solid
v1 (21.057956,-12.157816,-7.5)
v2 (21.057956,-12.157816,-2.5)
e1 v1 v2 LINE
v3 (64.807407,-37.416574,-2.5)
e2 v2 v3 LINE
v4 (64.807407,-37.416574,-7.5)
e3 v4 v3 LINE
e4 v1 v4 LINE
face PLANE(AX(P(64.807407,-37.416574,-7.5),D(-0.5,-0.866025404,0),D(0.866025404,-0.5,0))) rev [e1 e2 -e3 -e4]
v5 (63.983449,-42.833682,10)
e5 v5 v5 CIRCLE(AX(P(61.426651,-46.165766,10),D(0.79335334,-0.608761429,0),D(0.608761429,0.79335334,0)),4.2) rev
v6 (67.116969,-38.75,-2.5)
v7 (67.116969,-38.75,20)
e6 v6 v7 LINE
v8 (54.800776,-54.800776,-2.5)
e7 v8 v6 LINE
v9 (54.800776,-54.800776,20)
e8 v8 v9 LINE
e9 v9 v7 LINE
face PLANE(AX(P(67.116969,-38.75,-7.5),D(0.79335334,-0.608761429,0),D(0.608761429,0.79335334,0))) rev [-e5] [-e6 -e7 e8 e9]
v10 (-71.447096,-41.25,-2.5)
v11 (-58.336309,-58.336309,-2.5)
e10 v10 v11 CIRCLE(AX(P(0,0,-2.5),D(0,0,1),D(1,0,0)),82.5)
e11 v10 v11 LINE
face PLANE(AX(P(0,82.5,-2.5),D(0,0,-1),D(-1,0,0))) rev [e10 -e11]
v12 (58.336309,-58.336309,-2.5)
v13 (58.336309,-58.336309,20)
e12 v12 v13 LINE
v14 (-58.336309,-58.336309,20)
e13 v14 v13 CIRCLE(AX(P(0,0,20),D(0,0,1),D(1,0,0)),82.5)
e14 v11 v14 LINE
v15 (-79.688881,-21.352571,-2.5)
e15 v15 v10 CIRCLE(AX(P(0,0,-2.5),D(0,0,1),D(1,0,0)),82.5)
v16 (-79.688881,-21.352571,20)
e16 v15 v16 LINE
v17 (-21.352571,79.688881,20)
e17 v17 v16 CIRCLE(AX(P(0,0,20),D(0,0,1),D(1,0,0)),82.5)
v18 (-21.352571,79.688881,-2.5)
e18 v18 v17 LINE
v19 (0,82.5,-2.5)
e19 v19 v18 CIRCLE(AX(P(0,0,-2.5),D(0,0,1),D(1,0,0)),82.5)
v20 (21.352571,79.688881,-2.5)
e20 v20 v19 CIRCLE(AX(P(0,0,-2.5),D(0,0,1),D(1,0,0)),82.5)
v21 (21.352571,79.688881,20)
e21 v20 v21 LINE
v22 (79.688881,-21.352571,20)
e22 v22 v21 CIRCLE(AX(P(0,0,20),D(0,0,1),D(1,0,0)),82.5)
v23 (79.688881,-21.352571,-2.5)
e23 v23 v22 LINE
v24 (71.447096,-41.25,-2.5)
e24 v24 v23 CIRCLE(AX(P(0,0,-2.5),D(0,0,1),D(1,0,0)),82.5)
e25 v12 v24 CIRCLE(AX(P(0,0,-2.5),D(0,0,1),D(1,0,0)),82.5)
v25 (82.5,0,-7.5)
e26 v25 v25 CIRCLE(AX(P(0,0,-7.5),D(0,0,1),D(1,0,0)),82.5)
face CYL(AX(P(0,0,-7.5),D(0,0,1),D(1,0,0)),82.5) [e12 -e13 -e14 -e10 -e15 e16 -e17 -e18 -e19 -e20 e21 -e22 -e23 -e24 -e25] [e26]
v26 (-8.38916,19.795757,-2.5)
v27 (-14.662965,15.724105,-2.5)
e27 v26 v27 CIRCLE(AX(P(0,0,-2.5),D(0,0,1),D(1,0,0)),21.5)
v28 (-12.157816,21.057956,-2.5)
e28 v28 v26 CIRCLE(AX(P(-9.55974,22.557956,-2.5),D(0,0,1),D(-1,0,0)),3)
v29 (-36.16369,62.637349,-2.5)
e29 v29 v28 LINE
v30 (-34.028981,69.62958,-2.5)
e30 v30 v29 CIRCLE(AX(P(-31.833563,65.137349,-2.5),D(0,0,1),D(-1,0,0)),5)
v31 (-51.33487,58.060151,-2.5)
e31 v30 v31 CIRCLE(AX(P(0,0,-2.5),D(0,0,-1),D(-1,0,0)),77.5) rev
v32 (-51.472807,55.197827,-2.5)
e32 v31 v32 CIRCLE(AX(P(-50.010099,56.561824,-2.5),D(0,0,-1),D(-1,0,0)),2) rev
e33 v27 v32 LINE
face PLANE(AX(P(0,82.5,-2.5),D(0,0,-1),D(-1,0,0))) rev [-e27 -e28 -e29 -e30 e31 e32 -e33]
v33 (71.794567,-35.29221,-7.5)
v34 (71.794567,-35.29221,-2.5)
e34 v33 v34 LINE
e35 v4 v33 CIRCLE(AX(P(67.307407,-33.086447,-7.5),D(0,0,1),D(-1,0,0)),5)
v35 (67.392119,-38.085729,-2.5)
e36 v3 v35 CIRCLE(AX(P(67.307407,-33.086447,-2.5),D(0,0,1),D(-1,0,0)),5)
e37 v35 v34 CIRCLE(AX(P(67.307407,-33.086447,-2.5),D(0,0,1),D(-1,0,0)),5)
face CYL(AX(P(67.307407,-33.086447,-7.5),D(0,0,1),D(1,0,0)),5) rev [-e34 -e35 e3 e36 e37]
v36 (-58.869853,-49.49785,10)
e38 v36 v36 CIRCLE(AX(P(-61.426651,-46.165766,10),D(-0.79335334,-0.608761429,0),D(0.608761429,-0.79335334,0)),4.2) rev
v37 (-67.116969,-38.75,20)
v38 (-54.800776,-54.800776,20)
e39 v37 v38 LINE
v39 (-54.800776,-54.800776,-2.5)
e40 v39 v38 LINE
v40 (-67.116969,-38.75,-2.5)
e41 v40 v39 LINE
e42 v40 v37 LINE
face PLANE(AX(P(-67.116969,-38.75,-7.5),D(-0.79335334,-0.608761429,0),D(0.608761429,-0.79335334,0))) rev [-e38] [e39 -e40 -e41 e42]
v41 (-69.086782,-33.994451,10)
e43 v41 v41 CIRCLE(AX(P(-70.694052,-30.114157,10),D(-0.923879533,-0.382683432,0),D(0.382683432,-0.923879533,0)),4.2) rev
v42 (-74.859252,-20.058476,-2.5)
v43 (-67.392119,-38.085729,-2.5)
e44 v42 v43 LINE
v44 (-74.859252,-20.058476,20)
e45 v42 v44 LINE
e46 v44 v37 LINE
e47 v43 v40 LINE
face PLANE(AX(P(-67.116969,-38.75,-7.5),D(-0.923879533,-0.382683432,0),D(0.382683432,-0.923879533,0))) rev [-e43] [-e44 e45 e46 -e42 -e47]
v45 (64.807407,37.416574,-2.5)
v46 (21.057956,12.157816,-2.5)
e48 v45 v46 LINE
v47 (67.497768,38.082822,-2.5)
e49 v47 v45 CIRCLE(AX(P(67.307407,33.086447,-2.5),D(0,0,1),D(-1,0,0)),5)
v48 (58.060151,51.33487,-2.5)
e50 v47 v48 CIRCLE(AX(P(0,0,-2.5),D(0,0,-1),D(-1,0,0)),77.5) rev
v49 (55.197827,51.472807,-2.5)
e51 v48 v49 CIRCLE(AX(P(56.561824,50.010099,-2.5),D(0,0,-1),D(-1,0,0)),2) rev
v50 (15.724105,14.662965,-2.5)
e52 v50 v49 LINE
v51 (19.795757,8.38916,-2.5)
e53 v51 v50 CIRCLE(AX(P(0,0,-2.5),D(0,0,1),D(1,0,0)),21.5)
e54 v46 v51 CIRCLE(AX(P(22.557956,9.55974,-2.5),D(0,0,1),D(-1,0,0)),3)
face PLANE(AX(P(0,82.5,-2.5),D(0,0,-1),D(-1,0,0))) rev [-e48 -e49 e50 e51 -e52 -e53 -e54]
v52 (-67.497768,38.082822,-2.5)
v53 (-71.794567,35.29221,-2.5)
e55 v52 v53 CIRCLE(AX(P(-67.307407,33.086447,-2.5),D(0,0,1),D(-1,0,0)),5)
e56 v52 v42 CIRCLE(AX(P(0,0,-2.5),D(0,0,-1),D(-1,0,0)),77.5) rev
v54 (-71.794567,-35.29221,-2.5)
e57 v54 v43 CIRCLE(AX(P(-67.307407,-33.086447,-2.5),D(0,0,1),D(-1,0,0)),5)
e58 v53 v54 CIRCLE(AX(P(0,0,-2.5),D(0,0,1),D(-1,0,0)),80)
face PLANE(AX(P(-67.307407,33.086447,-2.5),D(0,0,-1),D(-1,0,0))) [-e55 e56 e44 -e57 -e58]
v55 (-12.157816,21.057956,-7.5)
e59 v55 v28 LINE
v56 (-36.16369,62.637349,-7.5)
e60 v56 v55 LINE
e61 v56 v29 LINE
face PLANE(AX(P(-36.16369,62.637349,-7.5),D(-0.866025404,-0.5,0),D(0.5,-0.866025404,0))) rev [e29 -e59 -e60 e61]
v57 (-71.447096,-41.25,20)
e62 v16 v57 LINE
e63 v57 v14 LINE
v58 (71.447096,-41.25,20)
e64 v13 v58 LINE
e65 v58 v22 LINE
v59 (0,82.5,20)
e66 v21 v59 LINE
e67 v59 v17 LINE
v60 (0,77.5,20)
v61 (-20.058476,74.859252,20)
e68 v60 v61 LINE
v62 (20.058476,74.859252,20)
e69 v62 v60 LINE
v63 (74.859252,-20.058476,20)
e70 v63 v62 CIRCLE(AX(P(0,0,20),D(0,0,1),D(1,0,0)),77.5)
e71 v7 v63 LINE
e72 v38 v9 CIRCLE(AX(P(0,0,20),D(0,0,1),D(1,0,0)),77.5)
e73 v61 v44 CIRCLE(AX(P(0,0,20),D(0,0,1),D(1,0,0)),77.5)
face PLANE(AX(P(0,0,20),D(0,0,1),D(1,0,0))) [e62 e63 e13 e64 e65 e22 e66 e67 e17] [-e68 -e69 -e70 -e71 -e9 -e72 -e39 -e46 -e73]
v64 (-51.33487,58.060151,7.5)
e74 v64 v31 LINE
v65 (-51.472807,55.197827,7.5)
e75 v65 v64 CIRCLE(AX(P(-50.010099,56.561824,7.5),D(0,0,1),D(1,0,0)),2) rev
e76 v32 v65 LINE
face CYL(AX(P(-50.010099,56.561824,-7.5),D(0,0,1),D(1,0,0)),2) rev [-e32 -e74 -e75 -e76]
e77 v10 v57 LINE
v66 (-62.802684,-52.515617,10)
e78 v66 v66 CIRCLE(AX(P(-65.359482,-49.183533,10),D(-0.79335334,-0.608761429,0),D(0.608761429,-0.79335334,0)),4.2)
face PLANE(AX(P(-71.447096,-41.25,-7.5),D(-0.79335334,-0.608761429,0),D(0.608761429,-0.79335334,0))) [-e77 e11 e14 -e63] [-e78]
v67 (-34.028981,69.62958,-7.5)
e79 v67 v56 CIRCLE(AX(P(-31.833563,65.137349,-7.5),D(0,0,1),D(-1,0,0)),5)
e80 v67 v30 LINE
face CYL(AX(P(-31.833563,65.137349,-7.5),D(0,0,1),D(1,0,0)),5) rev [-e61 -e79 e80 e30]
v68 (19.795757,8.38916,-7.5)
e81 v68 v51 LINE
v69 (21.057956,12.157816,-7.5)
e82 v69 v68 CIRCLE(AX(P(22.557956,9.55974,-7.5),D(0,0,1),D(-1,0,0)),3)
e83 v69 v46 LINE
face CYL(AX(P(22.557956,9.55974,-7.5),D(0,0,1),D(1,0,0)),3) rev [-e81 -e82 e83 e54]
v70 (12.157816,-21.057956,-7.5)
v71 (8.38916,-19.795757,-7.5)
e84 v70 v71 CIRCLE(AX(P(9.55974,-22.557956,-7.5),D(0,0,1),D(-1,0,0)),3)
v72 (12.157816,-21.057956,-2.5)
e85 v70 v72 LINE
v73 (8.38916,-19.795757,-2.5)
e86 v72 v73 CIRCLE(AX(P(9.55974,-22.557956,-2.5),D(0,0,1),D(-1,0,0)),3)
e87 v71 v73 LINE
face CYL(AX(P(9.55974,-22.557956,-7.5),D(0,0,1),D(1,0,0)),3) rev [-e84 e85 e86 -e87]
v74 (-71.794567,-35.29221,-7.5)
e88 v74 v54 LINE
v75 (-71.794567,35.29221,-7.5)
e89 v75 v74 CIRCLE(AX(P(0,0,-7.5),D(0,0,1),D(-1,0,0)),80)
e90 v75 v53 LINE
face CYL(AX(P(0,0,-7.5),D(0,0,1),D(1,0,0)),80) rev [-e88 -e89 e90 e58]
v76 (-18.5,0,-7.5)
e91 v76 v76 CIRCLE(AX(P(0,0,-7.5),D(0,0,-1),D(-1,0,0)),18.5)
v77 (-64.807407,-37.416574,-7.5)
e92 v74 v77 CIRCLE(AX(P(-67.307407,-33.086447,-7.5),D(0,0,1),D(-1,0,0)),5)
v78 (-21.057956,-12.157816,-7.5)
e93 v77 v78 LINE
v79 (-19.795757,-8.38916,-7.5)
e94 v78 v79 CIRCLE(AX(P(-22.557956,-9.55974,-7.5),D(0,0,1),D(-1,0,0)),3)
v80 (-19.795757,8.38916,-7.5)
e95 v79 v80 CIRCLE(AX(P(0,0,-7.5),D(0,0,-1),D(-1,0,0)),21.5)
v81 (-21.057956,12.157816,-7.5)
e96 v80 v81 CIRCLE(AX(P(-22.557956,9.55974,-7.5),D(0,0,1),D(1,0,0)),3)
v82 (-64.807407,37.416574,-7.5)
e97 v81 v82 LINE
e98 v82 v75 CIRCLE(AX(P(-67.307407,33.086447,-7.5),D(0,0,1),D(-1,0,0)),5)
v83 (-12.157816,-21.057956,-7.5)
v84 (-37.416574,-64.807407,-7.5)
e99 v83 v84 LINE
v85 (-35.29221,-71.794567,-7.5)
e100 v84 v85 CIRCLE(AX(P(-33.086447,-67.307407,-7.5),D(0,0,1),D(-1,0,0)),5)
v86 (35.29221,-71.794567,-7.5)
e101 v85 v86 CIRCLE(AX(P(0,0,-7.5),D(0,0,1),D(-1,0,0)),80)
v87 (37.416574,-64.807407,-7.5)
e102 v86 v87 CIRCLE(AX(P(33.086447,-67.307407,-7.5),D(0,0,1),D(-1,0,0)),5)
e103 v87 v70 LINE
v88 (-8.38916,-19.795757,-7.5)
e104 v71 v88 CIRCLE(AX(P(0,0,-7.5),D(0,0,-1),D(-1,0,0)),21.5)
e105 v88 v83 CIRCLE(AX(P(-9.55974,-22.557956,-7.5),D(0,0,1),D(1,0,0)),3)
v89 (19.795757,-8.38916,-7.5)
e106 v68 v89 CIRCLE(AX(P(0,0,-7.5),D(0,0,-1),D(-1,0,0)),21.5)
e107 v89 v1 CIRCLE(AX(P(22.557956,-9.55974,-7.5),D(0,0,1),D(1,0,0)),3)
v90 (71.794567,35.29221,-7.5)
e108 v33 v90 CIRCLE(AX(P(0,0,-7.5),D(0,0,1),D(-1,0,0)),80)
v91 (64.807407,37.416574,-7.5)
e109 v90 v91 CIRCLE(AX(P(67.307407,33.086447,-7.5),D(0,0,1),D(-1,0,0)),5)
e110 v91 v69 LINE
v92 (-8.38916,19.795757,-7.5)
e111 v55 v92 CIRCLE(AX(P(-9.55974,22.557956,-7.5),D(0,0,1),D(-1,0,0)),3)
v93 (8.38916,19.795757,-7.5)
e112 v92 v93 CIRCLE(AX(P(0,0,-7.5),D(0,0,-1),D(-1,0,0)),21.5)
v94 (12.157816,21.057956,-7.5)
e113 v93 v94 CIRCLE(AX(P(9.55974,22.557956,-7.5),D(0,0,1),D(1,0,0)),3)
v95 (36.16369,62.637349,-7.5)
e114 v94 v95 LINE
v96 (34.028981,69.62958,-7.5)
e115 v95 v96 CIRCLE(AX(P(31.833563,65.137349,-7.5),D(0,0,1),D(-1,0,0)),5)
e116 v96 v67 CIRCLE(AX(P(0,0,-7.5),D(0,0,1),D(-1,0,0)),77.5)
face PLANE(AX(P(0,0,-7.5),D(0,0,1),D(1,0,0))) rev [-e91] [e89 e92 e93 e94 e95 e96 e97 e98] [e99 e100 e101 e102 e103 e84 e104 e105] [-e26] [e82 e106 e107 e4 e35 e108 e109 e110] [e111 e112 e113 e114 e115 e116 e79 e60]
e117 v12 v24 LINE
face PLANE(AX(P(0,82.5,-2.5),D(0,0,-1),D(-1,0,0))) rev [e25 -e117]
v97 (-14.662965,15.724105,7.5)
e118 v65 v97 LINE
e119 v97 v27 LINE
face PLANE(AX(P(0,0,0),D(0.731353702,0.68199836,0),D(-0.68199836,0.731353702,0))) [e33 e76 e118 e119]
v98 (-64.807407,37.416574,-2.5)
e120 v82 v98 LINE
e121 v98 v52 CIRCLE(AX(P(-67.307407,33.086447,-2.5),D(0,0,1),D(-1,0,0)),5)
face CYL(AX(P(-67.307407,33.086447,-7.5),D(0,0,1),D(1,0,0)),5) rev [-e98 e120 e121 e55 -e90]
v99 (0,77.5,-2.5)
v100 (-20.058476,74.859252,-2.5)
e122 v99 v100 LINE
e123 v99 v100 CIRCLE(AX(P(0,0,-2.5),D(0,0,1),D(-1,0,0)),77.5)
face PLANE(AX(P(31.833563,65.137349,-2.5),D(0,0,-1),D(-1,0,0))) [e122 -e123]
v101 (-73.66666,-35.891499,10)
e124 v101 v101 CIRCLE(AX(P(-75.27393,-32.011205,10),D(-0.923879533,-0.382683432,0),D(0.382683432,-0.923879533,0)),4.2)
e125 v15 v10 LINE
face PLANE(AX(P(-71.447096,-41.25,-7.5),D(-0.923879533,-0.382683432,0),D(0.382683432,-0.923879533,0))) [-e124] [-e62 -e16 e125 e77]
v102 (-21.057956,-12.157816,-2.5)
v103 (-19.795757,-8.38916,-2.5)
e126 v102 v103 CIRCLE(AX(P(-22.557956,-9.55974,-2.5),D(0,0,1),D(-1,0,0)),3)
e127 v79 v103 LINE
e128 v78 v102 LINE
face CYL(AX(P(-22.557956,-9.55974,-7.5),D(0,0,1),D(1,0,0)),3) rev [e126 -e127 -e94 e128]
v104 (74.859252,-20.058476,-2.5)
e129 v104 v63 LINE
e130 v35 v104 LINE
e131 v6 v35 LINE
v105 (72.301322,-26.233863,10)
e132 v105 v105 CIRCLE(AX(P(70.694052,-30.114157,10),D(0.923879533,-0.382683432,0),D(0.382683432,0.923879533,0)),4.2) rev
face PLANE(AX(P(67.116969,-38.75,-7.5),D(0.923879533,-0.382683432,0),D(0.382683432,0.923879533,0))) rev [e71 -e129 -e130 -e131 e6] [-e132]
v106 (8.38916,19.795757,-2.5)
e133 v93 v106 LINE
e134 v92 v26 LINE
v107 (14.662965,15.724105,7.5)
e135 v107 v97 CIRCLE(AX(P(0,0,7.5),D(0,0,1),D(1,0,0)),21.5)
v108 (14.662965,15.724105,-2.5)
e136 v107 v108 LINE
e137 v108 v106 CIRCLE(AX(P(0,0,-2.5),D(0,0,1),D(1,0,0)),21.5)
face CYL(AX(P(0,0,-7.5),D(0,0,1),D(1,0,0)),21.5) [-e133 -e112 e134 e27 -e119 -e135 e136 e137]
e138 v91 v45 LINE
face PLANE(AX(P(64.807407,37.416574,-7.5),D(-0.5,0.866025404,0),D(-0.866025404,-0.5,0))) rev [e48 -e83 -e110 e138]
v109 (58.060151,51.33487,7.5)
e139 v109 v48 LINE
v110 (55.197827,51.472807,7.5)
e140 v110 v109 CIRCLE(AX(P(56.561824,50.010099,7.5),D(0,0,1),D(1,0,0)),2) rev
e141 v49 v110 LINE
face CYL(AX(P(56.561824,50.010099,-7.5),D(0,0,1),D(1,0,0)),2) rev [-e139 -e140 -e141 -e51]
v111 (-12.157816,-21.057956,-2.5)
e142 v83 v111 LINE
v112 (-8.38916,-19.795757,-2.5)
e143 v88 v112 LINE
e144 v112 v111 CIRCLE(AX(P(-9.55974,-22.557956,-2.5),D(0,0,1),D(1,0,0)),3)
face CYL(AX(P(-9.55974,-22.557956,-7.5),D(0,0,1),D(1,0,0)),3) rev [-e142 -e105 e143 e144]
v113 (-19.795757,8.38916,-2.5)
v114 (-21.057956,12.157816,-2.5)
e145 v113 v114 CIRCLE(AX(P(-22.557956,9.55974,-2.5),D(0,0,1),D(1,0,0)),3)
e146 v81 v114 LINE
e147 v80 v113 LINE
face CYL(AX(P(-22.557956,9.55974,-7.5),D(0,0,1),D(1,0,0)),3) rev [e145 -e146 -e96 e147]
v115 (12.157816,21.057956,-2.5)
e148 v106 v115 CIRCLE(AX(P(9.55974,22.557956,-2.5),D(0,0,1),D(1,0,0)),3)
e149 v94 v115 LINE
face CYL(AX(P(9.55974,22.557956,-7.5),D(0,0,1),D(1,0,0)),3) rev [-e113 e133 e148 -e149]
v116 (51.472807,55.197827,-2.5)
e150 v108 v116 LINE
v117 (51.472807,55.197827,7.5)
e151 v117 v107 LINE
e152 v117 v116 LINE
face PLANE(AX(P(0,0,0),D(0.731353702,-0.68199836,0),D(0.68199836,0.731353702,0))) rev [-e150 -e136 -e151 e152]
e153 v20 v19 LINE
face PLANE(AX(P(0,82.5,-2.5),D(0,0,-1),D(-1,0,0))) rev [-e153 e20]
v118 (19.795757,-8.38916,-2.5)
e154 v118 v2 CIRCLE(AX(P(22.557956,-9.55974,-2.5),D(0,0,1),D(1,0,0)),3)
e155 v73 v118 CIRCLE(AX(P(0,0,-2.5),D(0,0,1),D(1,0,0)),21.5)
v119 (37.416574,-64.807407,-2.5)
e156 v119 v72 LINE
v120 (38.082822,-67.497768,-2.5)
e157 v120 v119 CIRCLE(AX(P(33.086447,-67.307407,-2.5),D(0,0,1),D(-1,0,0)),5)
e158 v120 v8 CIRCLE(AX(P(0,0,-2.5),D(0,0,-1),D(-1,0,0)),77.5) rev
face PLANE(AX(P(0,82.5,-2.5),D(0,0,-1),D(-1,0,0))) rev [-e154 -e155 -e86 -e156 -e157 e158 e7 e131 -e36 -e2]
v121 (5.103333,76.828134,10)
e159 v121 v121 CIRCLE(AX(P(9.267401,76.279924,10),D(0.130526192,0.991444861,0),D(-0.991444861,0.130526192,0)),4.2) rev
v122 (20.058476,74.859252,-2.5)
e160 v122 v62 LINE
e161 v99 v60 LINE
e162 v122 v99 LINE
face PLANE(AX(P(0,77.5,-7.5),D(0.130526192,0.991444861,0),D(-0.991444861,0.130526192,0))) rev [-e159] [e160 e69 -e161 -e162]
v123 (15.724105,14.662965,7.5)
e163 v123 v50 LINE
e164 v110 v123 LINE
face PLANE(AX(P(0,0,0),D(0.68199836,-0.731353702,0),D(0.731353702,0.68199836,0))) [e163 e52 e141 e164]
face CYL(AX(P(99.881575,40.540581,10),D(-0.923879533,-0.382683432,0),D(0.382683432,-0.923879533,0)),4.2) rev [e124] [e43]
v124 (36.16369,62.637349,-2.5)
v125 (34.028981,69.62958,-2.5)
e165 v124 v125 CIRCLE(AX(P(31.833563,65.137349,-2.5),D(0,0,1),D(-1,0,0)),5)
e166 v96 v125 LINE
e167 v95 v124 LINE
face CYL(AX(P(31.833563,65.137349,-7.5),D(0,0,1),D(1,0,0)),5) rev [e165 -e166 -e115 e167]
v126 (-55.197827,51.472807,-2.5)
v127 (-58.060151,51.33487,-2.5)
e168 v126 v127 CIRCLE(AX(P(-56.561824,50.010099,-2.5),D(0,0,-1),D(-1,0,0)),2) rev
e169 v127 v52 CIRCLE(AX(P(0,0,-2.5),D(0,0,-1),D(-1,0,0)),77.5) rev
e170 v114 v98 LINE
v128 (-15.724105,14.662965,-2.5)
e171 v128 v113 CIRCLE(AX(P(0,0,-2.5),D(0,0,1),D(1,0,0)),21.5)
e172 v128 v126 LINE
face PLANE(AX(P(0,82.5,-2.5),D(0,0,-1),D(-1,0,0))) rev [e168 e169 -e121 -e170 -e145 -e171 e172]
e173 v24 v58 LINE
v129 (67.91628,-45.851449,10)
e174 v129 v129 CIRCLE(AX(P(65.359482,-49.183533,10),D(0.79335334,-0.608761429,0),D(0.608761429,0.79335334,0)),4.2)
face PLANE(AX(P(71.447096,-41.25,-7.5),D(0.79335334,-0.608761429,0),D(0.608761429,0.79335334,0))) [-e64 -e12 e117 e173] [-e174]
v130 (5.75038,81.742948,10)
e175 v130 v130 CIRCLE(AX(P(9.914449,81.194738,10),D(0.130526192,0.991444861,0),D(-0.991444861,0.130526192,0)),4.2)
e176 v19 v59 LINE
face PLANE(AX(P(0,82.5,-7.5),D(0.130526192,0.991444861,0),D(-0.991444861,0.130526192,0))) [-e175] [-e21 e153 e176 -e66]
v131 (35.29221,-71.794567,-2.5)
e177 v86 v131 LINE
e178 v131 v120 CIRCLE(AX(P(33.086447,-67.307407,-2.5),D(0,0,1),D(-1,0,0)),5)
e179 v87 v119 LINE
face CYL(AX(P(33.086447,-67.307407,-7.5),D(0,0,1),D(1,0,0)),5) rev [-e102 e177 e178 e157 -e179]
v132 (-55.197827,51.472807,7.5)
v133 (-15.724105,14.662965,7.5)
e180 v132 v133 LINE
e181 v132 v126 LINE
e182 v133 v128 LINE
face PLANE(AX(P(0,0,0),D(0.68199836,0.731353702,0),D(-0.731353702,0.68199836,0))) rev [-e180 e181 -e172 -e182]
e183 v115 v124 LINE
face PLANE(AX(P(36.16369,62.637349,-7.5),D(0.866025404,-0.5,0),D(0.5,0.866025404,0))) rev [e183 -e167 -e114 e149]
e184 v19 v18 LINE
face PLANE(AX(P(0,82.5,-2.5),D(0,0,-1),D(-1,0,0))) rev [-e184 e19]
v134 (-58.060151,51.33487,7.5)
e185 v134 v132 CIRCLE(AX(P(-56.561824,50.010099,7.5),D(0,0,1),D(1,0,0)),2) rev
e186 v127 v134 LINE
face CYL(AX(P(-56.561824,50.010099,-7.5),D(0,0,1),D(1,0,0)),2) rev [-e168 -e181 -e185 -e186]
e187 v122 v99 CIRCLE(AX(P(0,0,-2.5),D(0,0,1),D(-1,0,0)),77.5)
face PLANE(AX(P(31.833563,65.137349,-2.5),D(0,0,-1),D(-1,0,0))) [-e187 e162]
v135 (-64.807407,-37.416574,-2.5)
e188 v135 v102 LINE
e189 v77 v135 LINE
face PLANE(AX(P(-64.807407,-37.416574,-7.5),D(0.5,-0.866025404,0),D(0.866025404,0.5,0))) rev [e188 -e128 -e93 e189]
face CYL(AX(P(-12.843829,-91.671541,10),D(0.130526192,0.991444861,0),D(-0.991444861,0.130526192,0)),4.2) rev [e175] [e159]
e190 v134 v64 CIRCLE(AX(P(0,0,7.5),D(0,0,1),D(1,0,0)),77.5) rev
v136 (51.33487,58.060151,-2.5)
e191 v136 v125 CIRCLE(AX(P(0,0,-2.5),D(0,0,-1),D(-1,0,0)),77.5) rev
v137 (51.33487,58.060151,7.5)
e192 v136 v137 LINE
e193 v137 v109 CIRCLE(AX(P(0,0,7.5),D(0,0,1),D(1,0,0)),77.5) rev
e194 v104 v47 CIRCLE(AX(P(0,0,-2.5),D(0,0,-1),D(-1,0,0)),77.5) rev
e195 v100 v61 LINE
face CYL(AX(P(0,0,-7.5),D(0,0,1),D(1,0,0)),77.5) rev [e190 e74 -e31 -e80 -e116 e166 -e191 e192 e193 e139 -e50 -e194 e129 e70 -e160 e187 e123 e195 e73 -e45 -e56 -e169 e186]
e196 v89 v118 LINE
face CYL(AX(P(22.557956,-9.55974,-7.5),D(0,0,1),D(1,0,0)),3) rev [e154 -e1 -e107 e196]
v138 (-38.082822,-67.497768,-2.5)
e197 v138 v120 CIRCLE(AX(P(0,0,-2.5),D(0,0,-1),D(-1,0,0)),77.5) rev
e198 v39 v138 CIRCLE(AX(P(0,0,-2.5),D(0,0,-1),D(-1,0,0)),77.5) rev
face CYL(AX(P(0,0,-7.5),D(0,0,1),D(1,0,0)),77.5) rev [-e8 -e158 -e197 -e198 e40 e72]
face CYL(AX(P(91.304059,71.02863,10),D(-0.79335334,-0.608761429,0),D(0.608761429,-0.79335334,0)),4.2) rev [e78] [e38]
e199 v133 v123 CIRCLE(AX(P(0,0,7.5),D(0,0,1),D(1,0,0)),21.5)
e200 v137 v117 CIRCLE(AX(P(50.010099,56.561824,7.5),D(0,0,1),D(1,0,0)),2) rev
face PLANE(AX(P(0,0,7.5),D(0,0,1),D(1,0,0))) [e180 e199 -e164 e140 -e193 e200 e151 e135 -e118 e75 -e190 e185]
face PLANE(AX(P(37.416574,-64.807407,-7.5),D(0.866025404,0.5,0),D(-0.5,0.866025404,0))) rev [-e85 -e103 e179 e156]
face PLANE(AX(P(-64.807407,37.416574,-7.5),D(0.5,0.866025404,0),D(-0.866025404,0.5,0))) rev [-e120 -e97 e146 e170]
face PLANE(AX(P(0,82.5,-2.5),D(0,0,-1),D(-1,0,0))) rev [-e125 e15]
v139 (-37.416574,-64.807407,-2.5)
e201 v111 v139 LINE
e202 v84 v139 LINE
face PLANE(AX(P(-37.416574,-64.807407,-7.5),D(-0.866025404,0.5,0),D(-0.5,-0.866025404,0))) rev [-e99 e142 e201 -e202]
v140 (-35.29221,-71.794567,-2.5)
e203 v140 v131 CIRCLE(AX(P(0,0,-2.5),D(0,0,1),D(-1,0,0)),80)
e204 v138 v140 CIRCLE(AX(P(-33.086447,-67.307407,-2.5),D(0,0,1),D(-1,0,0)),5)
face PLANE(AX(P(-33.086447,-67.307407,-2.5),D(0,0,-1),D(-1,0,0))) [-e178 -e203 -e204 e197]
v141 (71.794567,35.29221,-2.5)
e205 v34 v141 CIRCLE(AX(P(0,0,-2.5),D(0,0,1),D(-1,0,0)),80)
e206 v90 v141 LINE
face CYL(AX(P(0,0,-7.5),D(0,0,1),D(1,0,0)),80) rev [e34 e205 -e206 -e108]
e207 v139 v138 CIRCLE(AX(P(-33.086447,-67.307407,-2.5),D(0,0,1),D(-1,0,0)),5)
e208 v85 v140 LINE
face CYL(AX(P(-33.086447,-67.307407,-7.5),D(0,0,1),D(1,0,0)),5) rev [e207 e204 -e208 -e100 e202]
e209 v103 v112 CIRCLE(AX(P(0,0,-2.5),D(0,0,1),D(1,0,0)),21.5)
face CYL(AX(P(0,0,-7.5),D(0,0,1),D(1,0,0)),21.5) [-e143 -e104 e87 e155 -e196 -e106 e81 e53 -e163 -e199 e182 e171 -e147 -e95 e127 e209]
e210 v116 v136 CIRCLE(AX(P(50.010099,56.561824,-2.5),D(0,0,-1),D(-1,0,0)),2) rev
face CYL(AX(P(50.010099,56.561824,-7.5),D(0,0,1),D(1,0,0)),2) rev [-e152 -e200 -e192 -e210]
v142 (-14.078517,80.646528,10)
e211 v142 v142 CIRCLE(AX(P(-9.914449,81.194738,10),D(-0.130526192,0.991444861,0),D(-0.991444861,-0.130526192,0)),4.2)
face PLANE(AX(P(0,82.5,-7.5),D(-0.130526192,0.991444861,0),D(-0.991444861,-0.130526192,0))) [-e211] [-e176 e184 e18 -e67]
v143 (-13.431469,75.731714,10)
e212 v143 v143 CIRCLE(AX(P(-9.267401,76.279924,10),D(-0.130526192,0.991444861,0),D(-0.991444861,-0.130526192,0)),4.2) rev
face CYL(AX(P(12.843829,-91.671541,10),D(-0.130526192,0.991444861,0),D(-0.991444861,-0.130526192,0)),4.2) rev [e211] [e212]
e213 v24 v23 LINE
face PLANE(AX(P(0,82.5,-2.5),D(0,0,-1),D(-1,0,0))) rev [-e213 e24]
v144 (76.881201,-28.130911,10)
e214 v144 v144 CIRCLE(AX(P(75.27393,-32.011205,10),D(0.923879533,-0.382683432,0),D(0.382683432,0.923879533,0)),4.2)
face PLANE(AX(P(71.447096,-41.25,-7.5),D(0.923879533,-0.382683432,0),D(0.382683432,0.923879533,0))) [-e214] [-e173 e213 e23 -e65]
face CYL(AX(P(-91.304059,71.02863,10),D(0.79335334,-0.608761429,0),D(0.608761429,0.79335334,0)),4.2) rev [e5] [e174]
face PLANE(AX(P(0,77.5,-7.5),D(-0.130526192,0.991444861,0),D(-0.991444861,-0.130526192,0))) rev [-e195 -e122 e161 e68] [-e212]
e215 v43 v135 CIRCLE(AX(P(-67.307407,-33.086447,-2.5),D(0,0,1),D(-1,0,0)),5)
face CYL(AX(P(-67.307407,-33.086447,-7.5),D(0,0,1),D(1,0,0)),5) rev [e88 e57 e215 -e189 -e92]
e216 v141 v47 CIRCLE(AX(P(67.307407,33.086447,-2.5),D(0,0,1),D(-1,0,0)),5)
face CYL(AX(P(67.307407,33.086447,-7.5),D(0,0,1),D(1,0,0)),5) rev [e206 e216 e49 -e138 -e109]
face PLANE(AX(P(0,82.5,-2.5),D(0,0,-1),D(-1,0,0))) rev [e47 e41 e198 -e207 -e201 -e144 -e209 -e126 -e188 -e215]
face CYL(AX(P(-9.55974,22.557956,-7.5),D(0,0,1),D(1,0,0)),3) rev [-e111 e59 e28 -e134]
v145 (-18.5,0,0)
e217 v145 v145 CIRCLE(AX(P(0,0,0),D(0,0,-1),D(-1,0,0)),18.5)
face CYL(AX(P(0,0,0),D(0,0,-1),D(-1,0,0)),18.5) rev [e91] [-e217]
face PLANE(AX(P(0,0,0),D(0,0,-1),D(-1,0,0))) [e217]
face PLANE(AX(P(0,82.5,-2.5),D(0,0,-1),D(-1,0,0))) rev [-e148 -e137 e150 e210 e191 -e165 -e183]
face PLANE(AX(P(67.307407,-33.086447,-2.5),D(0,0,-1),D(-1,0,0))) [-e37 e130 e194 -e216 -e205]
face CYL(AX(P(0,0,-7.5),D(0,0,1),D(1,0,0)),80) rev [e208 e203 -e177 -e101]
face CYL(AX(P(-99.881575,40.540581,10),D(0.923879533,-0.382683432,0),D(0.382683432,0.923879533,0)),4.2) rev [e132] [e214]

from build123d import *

# Parameters (mm, degrees)
EXTRUDE_1_DEPTH                  = 20
EXTRUDE_1_DEPTH_BACK             = 7.5
EXTRUDE_3_DEPTH                  = 7.5
EXTRUDE_3_DEPTH_BACK             = 7.5
SKETCH_3_R                       = 21.5
SKETCH_4_R                       = 18.5
CUT_EXTRUDE_1_DEPTH              = 7.5
SKETCH_12_W                      = 5
SKETCH_12_H                      = 61
CUT_EXTRUDE_6_DEPTH              = 119.822346383
REVOLVE_START                    = -2.5
REVOLVE_3_DEPTH                  = 10
FILLET_1_R                       = 2
PATTERN_CIRCULAR_1_COUNT         = 2
PATTERN_CIRCULAR_1_ANGLE         = 90
FILLET_1_OF_PATTERN_CIRCULAR_1_R = 2
CUT_EXTRUDE_7_REACH              = 191.328
SKETCH_15_R                      = 4.2
CUT_EXTRUDE_8_REACH              = 191.328
SKETCH_16_R                      = 4.2
PATTERN_CIRCULAR_2_COUNT         = 3


# Read off the part's stored shape, not the designer's step: 旋转3
with BuildPart() as part:
    # 草图1 → 凸台-拉伸1 (new, two sides: drawn at the far end of the back side and taken through both)
    with BuildSketch(Plane.XY.offset(-EXTRUDE_1_DEPTH_BACK)):
        with BuildLine():
            Line((0, 82.5), (21.352571221, 79.688880669))
            ThreePointArc((21.352571221, 79.688880669), (71.447095812, 41.25), (79.688880669, -21.352571221))
            Line((79.688880669, -21.352571221), (71.447095812, -41.25))
            Line((71.447095812, -41.25), (58.336309448, -58.336309448))
            ThreePointArc((58.336309448, -58.336309448), (0, -82.5), (-58.336309448, -58.336309448))
            Line((-58.336309448, -58.336309448), (-71.447095812, -41.25))
            Line((-71.447095812, -41.25), (-79.688880669, -21.352571221))
            ThreePointArc((-79.688880669, -21.352571221), (-71.447095812, 41.25), (-21.352571221, 79.688880669))
            Line((-21.352571221, 79.688880669), (0, 82.5))
        make_face()
        with BuildLine():
            Line((0, 77.5), (20.058475995, 74.859251537))
            ThreePointArc((20.058475995, 74.859251537), (67.116968793, 38.75), (74.859251537, -20.058475995))
            Line((74.859251537, -20.058475995), (67.116968793, -38.75))
            Line((67.116968793, -38.75), (54.800775542, -54.800775542))
            ThreePointArc((54.800775542, -54.800775542), (0, -77.5), (-54.800775542, -54.800775542))
            Line((-54.800775542, -54.800775542), (-67.116968793, -38.75))
            Line((-67.116968793, -38.75), (-74.859251537, -20.058475995))
            ThreePointArc((-74.859251537, -20.058475995), (-67.116968793, 38.75), (-20.058475995, 74.859251537))
            Line((-20.058475995, 74.859251537), (0, 77.5))
        make_face(mode=Mode.SUBTRACT)
    extrude(amount=EXTRUDE_1_DEPTH + EXTRUDE_1_DEPTH_BACK)



with BuildPart() as body_2:
    # 草图3 → 凸台-拉伸3 (new, two sides: drawn at the far end of the back side and taken through both)
    with BuildSketch(Plane.XY.offset(-EXTRUDE_3_DEPTH_BACK)):
        Circle(SKETCH_3_R)
    extrude(amount=EXTRUDE_3_DEPTH + EXTRUDE_3_DEPTH_BACK)

    # 草图4 → 切除-拉伸1 (cut)
    with BuildSketch(Plane(origin=(0, 0, -7.5), x_dir=(-1, 0, 0), z_dir=(0, 0, -1))):
        Circle(SKETCH_4_R)
    extrude(amount=-CUT_EXTRUDE_1_DEPTH, mode=Mode.SUBTRACT)


with BuildPart() as part_1:
    add(part.part)

    add(body_2.part)  # 旋转2 merges body 2
    # 草图12 → 旋转2 (revolve)
    with BuildSketch(Plane(origin=(0, 0, 0), x_dir=(0, 0, -1), z_dir=(1, 0, 0)), mode=Mode.PRIVATE) as revolve_2_sk:
        with Locations((5, 52)):
            Rectangle(SKETCH_12_W, SKETCH_12_H)
    revolve(revolve_2_sk.sketch.rotate(Axis((0, 0, 0), (0, 0, -1)), 90), axis=Axis((0, 0, 0), (0, 0, -1)))

    # 草图13 → 切除-拉伸6 (cut, through all)
    with BuildSketch(Plane.XY.offset(-2.5)):
        with BuildLine():
            Line((-36.163690354, 62.637349082), (-12.157816416, 21.057955741))
            ThreePointArc((-12.157816416, 21.057955741), (-10.512484879, 19.713262861), (-8.389159771, 19.795757079))
            ThreePointArc((-8.389159771, 19.795757079), (0, 21.5), (8.389159771, 19.795757079))
            ThreePointArc((8.389159771, 19.795757079), (10.512484879, 19.713262861), (12.157816416, 21.057955741))
            Line((12.157816416, 21.057955741), (36.163690354, 62.637349082))
            ThreePointArc((36.163690354, 62.637349082), (36.615666268, 66.597311937), (34.028981496, 69.629580053))
            ThreePointArc((34.028981496, 69.629580053), (0, 77.5), (-34.028981496, 69.629580053))
            ThreePointArc((-34.028981496, 69.629580053), (-36.615666268, 66.597311937), (-36.163690354, 62.637349082))
        make_face()
        with BuildLine():
            Line((64.807406984, 37.416573868), (21.057955741, 12.157816416))
            ThreePointArc((21.057955741, 12.157816416), (19.713262861, 10.512484879), (19.795757079, 8.389159771))
            ThreePointArc((19.795757079, 8.389159771), (21.5, 0), (19.795757079, -8.389159771))
            ThreePointArc((19.795757079, -8.389159771), (19.713262861, -10.512484879), (21.057955741, -12.157816416))
            Line((21.057955741, -12.157816416), (64.807406984, -37.416573868))
            ThreePointArc((64.807406984, -37.416573868), (68.761859517, -37.870228599), (71.79456745, -35.292209972))
            ThreePointArc((71.79456745, -35.292209972), (80, 0), (71.79456745, 35.292209972))
            ThreePointArc((71.79456745, 35.292209972), (68.761859517, 37.870228599), (64.807406984, 37.416573868))
        make_face()
        with BuildLine():
            Line((37.416573868, -64.807406984), (12.157816416, -21.057955741))
            ThreePointArc((12.157816416, -21.057955741), (10.512484879, -19.713262861), (8.389159771, -19.795757079))
            ThreePointArc((8.389159771, -19.795757079), (0, -21.5), (-8.389159771, -19.795757079))
            ThreePointArc((-8.389159771, -19.795757079), (-10.512484879, -19.713262861), (-12.157816416, -21.057955741))
            Line((-12.157816416, -21.057955741), (-37.416573868, -64.807406984))
            ThreePointArc((-37.416573868, -64.807406984), (-37.870228599, -68.761859517), (-35.292209972, -71.79456745))
            ThreePointArc((-35.292209972, -71.79456745), (0, -80), (35.292209972, -71.79456745))
            ThreePointArc((35.292209972, -71.79456745), (37.870228599, -68.761859517), (37.416573868, -64.807406984))
        make_face()
        with BuildLine():
            Line((-64.807406984, -37.416573868), (-21.057955741, -12.157816416))
            ThreePointArc((-21.057955741, -12.157816416), (-19.713262861, -10.512484879), (-19.795757079, -8.389159771))
            ThreePointArc((-19.795757079, -8.389159771), (-21.5, 0), (-19.795757079, 8.389159771))
            ThreePointArc((-19.795757079, 8.389159771), (-19.713262861, 10.512484879), (-21.057955741, 12.157816416))
            Line((-21.057955741, 12.157816416), (-64.807406984, 37.416573868))
            ThreePointArc((-64.807406984, 37.416573868), (-68.761859517, 37.870228599), (-71.79456745, 35.292209972))
            ThreePointArc((-71.79456745, 35.292209972), (-80, 0), (-71.79456745, -35.292209972))
            ThreePointArc((-71.79456745, -35.292209972), (-68.761859517, -37.870228599), (-64.807406984, -37.416573868))
        make_face()
    extrude(amount=-CUT_EXTRUDE_6_DEPTH, mode=Mode.SUBTRACT)

    # 旋转3 outline → 旋转3 (add)
    with BuildSketch(Plane.XY.offset(REVOLVE_START)):
        with BuildLine():
            Line((52.854872905, 56.679911875), (14.662964741, 15.724104585))
            ThreePointArc((14.662964741, 15.724104585), (15.202795796, 15.202795796), (15.724104585, 14.662964741))
            Line((15.724104585, 14.662964741), (56.679911875, 52.854872905))
            ThreePointArc((56.679911875, 52.854872905), (54.800775542, 54.800775542), (52.854872905, 56.679911875))
        make_face()
    revolve_3 = extrude(amount=REVOLVE_3_DEPTH)

    # 圆角1
    fillet_1_edges = [part_1.edges().sort_by_distance(p)[0] for p in [
        (52.854872905, 56.679911875, 2.5),
        (56.679911875, 52.854872905, 2.5),
    ]]
    fillet(fillet_1_edges, radius=FILLET_1_R)

    # 阵列(圆周)1: 旋转3 ×2 about axis
    pattern_circular_1_axis = Axis((0, 0, 0), (0, 0, 1))
    for i in range(1, PATTERN_CIRCULAR_1_COUNT):
        add(revolve_3.rotate(pattern_circular_1_axis, i * PATTERN_CIRCULAR_1_ANGLE / (PATTERN_CIRCULAR_1_COUNT - 1)))

    # 圆角1 of 阵列(圆周)1
    fillet_1_of_pattern_circular_1_edges = [part_1.edges().sort_by_distance(p)[0] for p in [
        (-56.679911875, 52.854872905, 2.5),
        (-52.854872905, 56.679911875, 2.5),
    ]]
    fillet(fillet_1_of_pattern_circular_1_edges, radius=FILLET_1_OF_PATTERN_CIRCULAR_1_R)

    # 草图15 → 切除-拉伸7 (cut, up to next)
    with BuildSketch(Plane(origin=(10.67628561, 81.094440334, 0), x_dir=(0.991444861373809, -0.13052619222006237, 0), z_dir=(0.13052619222006237, 0.9914448613738092, 0)), mode=Mode.PRIVATE) as cut_extrude_7_sk1:
        with Locations(Location((-0.768410858, -10, 0), (0, 0, 180))):
            Circle(SKETCH_15_R)
    cut_extrude_7_tool1 = extrude(cut_extrude_7_sk1.sketch, amount=-CUT_EXTRUDE_7_REACH, mode=Mode.PRIVATE) & part_1.part
    cut_extrude_7 = cut_extrude_7_tool1.solids().sort_by_distance((9.914449, 81.194738, 10))[0]
    add(cut_extrude_7, mode=Mode.SUBTRACT)

    # 草图16 → 切除-拉伸8 (cut, up to next)
    with BuildSketch(Plane(origin=(-10.67628561, 81.094440334, 0), x_dir=(0.991444861373809, 0.13052619222006237, 0), z_dir=(-0.13052619222006237, 0.9914448613738092, 0)), mode=Mode.PRIVATE) as cut_extrude_8_sk1:
        with Locations(Location((0.768410858, -10, 0), (0, 0, 180))):
            Circle(SKETCH_16_R)
    cut_extrude_8_tool1 = extrude(cut_extrude_8_sk1.sketch, amount=-CUT_EXTRUDE_8_REACH, mode=Mode.PRIVATE) & part_1.part
    cut_extrude_8 = cut_extrude_8_tool1.solids().sort_by_distance((-9.914449, 81.194738, 10))[0]
    add(cut_extrude_8, mode=Mode.SUBTRACT)

    # 阵列(圆周)2: 切除-拉伸7, 切除-拉伸8 ×3 about axis
    pattern_circular_2_axis = Axis((0, 0, 0), (0, 0, 1))
    add([cut_extrude_7.rotate(pattern_circular_2_axis, i * 360 / PATTERN_CIRCULAR_2_COUNT) for i in range(1, PATTERN_CIRCULAR_2_COUNT)], mode=Mode.SUBTRACT)
    add([cut_extrude_8.rotate(pattern_circular_2_axis, i * 360 / PATTERN_CIRCULAR_2_COUNT) for i in range(1, PATTERN_CIRCULAR_2_COUNT)], mode=Mode.SUBTRACT)


solid = part_1.part
